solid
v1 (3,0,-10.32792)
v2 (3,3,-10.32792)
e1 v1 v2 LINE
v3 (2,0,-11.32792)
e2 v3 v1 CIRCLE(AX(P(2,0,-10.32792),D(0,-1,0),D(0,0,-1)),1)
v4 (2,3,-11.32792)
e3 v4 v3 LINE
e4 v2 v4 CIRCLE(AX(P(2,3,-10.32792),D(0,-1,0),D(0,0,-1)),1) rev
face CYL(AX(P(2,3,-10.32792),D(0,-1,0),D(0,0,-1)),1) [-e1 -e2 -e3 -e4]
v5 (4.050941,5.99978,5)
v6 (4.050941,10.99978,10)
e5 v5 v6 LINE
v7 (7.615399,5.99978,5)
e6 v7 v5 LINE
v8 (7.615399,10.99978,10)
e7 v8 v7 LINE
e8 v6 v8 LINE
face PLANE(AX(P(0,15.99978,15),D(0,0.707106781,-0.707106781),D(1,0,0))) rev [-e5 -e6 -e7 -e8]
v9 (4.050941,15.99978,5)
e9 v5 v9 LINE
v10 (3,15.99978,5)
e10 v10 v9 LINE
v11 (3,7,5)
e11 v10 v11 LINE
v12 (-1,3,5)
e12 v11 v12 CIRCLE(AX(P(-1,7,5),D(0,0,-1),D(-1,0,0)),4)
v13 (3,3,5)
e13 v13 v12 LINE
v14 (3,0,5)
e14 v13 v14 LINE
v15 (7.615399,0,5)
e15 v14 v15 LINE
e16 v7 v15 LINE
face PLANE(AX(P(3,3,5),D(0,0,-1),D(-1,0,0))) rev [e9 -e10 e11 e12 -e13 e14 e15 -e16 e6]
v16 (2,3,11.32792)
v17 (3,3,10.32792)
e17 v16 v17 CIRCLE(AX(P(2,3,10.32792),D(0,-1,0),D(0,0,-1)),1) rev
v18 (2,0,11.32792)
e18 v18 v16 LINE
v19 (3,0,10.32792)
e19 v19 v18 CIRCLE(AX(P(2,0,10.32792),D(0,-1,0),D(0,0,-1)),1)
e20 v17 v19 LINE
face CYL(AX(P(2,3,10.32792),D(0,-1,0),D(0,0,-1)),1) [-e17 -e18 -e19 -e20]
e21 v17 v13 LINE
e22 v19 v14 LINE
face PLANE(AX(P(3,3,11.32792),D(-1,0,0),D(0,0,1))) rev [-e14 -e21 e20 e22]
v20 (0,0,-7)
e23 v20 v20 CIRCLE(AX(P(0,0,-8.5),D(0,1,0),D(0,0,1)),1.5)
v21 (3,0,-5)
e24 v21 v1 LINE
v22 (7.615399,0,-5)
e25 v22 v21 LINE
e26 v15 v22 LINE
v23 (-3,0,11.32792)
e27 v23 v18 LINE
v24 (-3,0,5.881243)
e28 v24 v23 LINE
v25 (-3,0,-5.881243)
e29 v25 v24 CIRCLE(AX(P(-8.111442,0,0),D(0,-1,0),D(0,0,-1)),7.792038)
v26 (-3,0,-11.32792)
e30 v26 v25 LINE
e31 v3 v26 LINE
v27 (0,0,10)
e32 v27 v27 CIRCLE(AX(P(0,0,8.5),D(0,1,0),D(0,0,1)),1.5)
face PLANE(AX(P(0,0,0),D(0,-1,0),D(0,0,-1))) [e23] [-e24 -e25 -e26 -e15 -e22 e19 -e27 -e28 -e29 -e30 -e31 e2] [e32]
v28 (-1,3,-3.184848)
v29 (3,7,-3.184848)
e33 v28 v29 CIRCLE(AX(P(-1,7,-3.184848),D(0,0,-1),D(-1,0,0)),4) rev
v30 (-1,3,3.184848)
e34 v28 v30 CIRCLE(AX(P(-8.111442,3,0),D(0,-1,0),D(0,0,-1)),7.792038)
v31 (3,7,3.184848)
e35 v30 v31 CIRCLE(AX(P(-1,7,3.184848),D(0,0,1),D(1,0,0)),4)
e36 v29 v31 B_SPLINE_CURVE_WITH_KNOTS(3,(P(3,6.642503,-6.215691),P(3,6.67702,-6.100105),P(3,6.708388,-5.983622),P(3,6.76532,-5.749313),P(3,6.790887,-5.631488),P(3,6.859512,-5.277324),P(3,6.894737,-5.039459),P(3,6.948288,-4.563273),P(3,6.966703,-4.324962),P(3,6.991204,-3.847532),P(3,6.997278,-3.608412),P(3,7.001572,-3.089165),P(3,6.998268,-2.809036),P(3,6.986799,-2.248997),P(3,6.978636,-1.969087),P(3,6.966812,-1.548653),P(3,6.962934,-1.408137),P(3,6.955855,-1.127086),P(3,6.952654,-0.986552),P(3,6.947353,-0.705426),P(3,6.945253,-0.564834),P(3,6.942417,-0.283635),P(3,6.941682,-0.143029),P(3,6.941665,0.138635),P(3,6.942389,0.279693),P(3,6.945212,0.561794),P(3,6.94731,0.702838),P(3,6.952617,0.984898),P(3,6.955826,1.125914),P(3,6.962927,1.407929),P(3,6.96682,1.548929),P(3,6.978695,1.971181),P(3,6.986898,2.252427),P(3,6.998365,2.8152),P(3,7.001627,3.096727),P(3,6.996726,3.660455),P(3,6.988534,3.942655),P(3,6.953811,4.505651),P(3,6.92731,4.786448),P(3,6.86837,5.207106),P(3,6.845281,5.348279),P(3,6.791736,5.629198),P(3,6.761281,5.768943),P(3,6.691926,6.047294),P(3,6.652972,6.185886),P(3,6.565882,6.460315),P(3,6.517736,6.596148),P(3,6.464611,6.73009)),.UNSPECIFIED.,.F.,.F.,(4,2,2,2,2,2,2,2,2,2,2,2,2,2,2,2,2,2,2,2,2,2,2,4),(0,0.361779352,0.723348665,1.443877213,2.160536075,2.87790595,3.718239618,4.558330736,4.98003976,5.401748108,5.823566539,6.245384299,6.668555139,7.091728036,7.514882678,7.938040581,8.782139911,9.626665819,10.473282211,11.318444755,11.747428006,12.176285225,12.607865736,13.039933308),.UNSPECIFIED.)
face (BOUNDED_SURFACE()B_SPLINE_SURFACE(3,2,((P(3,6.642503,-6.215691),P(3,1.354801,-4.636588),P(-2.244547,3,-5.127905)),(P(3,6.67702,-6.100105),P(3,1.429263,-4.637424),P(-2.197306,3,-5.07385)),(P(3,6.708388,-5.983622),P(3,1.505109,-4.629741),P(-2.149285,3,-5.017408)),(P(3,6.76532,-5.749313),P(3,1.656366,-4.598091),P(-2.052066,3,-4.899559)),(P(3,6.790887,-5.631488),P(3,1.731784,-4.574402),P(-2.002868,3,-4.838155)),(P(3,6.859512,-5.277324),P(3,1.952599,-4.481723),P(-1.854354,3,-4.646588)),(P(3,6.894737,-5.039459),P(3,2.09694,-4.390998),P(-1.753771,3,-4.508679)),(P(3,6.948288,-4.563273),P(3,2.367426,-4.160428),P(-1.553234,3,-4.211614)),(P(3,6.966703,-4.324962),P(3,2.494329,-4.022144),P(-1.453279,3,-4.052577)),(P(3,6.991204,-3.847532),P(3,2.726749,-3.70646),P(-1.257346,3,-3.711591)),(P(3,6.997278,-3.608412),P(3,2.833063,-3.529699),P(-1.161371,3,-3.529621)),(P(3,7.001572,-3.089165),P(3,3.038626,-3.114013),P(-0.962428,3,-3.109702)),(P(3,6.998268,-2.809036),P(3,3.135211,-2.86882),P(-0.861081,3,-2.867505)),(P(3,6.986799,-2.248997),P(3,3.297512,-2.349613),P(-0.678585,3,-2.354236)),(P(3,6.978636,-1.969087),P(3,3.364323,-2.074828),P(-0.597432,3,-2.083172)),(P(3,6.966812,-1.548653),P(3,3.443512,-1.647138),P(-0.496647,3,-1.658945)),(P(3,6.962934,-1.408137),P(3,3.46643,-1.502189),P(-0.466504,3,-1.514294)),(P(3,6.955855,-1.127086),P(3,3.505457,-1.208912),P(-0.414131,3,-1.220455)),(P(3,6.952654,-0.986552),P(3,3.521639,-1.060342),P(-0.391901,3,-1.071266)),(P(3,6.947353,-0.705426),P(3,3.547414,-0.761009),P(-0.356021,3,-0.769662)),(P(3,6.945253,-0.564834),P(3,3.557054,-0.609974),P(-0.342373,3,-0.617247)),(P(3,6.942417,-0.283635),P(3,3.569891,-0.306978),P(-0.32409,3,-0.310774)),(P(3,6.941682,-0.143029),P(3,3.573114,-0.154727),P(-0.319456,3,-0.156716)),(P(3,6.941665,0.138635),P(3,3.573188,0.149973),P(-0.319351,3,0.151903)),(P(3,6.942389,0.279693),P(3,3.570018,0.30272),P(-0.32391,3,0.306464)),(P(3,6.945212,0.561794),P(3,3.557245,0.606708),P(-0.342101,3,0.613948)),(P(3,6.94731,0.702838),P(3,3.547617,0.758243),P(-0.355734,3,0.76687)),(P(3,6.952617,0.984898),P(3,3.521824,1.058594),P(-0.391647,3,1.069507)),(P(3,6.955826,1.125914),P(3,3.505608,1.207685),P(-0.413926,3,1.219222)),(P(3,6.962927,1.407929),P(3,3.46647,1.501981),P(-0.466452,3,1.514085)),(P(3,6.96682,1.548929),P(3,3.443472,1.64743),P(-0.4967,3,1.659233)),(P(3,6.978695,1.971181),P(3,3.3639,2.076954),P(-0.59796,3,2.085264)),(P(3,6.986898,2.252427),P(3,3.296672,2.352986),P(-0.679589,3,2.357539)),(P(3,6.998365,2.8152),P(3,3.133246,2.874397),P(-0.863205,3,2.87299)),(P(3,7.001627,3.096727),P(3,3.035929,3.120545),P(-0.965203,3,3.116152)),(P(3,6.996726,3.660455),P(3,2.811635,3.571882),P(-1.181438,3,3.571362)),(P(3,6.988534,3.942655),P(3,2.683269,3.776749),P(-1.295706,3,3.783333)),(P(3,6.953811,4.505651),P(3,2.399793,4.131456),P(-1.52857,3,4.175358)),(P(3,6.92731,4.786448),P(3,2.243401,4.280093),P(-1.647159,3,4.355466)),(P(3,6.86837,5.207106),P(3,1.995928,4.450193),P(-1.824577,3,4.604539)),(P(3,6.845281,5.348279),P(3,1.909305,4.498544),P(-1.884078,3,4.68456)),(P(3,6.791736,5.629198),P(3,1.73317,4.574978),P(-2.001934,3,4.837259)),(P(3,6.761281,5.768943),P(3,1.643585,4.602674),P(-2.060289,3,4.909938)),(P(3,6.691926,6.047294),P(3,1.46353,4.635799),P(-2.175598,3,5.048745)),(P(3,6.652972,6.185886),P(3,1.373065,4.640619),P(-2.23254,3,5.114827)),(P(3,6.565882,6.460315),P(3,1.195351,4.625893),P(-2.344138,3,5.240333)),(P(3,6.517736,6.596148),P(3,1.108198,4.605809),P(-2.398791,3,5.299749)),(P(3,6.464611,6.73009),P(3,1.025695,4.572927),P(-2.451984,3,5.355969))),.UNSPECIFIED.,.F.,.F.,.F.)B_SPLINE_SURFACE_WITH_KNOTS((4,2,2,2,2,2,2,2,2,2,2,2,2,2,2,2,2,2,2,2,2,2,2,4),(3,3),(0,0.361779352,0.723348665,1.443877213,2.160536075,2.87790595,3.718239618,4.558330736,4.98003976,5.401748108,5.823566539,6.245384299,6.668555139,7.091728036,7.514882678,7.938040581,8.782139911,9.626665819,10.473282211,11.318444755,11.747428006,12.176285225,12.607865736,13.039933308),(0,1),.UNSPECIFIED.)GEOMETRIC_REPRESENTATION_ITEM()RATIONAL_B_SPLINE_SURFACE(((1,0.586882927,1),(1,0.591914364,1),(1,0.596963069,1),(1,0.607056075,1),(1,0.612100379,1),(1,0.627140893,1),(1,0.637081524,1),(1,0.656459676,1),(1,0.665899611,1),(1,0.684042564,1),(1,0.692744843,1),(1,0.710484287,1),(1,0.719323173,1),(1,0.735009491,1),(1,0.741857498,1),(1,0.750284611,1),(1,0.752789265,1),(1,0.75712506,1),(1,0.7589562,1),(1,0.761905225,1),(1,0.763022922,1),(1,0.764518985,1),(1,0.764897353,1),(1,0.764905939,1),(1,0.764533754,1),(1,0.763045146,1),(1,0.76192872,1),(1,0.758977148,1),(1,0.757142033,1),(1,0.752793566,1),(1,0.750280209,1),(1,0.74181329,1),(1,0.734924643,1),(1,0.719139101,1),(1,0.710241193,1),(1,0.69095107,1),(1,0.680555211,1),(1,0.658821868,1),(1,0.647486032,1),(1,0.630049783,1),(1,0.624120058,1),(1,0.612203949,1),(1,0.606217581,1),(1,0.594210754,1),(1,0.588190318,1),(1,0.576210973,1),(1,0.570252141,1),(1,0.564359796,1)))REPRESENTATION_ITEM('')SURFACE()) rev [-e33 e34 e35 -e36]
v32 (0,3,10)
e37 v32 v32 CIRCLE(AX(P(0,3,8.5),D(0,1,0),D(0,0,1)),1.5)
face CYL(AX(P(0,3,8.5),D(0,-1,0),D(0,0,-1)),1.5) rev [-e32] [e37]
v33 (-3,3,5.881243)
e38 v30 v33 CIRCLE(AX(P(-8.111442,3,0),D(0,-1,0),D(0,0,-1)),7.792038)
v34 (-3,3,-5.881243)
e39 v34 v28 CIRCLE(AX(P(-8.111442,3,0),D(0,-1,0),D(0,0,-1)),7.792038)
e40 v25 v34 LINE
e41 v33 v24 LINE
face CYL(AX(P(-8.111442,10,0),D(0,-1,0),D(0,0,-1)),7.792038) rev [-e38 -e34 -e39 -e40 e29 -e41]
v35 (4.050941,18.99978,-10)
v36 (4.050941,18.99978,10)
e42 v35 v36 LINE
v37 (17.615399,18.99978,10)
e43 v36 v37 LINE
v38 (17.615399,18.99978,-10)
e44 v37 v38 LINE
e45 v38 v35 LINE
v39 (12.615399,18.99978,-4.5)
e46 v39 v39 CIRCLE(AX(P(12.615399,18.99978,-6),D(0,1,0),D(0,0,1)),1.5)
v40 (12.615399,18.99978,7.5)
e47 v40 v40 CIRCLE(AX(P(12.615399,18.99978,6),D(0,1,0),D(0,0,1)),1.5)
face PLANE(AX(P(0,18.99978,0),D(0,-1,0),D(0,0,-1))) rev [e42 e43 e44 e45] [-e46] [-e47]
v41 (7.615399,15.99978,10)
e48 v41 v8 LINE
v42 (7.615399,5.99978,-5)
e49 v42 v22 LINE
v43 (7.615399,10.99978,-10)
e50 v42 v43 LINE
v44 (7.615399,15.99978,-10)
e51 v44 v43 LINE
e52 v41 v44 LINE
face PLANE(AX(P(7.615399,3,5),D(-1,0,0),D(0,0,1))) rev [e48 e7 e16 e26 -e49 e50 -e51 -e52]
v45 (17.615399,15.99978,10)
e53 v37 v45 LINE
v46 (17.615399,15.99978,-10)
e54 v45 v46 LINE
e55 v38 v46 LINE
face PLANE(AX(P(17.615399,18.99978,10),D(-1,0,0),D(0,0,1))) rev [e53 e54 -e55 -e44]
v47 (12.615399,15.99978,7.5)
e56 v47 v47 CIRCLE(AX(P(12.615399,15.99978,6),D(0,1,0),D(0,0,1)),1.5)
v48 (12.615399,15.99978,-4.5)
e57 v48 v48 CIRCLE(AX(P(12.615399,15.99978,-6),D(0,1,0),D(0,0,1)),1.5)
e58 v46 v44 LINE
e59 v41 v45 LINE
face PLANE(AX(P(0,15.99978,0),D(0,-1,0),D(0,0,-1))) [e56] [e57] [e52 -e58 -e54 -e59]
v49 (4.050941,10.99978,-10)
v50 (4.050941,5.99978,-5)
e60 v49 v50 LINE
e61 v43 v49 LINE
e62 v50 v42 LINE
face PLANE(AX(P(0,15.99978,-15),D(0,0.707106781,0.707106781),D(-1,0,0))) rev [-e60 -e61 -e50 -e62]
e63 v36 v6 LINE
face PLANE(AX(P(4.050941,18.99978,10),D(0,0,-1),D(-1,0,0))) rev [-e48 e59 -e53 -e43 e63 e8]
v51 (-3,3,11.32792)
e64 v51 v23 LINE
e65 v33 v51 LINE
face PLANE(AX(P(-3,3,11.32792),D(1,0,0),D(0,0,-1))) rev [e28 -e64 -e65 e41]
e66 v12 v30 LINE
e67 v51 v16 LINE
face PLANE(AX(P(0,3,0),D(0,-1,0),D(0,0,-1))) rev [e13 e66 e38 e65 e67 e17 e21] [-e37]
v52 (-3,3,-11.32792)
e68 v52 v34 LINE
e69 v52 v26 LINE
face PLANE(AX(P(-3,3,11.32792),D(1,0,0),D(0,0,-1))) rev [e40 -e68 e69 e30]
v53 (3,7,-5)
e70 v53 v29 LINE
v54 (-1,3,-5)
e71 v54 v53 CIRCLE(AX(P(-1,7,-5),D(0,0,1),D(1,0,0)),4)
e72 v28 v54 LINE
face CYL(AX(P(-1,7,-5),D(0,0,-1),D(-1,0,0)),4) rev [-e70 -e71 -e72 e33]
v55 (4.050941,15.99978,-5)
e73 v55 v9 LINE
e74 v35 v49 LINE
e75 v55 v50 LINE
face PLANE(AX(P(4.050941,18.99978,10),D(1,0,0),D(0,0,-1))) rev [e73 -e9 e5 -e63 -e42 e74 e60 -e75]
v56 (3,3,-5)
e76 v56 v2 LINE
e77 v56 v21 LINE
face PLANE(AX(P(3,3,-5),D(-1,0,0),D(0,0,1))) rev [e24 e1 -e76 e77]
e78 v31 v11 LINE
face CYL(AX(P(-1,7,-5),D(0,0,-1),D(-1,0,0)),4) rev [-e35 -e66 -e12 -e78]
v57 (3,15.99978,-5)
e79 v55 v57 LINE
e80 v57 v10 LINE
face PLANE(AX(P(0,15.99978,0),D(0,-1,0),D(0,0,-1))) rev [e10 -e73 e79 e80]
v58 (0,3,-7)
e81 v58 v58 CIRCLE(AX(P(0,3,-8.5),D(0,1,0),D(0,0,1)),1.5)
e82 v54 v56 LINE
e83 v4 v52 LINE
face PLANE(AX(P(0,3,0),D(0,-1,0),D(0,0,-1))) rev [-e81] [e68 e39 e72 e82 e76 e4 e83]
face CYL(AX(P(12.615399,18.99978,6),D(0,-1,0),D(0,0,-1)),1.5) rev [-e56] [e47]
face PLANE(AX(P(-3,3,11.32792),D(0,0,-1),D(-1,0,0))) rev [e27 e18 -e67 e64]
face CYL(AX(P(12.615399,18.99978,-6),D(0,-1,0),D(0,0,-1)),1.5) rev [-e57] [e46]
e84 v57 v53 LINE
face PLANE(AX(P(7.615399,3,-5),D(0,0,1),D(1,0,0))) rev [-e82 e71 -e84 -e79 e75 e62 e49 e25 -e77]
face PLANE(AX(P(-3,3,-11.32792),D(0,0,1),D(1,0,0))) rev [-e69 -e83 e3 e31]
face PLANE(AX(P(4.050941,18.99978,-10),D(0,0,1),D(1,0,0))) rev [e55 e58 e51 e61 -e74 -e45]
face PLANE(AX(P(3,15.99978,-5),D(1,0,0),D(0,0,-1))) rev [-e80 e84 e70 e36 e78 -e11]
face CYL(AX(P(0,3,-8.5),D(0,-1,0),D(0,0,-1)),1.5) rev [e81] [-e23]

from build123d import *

# Parameters (mm, degrees)
SKETCH1_R           = 1.5
BOSS_EXTRUDE1_DEPTH = 3
SKETCH3_W           = 4.615398666
SKETCH3_H           = 10
BOSS_EXTRUDE2_DEPTH = 12.9997796
FILLET7_R           = 1
CUT_EXTRUDE4_DEPTH  = 10
SKETCH9_W           = 13.564457496
SKETCH9_H           = 20
SKETCH9_R           = 1.5
BOSS_EXTRUDE3_DEPTH = 3
CHAMFER1_SIZE       = 10
CHAMFER2_SIZE       = 10
FILLET8_R           = 4


with BuildPart() as part:
    # Sketch1 → Boss-Extrude1 (new body)
    with BuildSketch(Plane(origin=(0, 0, 0), x_dir=(1, 0, 0), z_dir=(0, 1, 0))):
        Polygon((-3, -11.32792047), (3, -11.32792047), (3, -5), (7.615398666, -5), (7.615398666, 5), (3, 5), (3, 11.32792047), (-3, 11.32792047), align=None)
        with Locations(Location((0, 8.5, 0), (0, 0, 270))):
            Circle(SKETCH1_R, mode=Mode.SUBTRACT)
        with Locations(Location((0, -8.5, 0), (0, 0, 270))):
            Circle(SKETCH1_R, mode=Mode.SUBTRACT)
    extrude(amount=BOSS_EXTRUDE1_DEPTH)

    # Sketch3 → Boss-Extrude2 (add)
    with BuildSketch(Plane(origin=(0, 3, 0), x_dir=(1, 0, 0), z_dir=(0, 1, 0))):
        with Locations((5.307699333, 0)):
            Rectangle(SKETCH3_W, SKETCH3_H)
    extrude(amount=BOSS_EXTRUDE2_DEPTH)

    # Fillet7
    fillet7_edges = [part.edges().sort_by_distance(p)[0] for p in [
        (3, 1.5, 11.32792047),
        (3, 1.5, -11.32792047),
    ]]
    fillet(fillet7_edges, radius=FILLET7_R)

    # Sketch7 → Cut-Extrude4 (cut)
    with BuildSketch(Plane.XZ):
        with BuildLine():
            Line((-3.65526474, -6.392053518), (-3.78188192, 6.478485425))
            ThreePointArc((-3.78188192, 6.478485425), (-0.319780446, 0.076652438), (-3.65526474, -6.392053518))
        make_face()
    extrude(amount=-CUT_EXTRUDE4_DEPTH, mode=Mode.SUBTRACT)

    # Sketch9 → Boss-Extrude3 (add)
    with BuildSketch(Plane(origin=(0, 15.9997796, 0), x_dir=(1, 0, 0), z_dir=(0, 1, 0))):
        with Locations((10.833169918, 0)):
            Rectangle(SKETCH9_W, SKETCH9_H)
        with Locations(Location((12.615398666, 6, 0), (0, 0, 270))):
            Circle(SKETCH9_R, mode=Mode.SUBTRACT)
        with Locations(Location((12.615398666, -6, 0), (0, 0, 270))):
            Circle(SKETCH9_R, mode=Mode.SUBTRACT)
    extrude(amount=BOSS_EXTRUDE3_DEPTH)

    # Chamfer1
    # the kernel refuses this chamfer: 10 mm, written as the material it adds along each edge
    with BuildSketch(Plane(origin=(4.05094117, 15.9997796, 5), x_dir=(0, -0.9996219169112968, -0.027495876610586403), z_dir=(1, 0, 0))) as chamfer1_piece_1_section:
        Polygon((CHAMFER1_SIZE * 0.999621916911, -CHAMFER1_SIZE * 0.0274958766106), (-CHAMFER1_SIZE * 0.0274958766106, -CHAMFER1_SIZE * 0.999621916911), (0, 0), align=None)
    chamfer1_piece_1 = extrude(amount=3.564457497, mode=Mode.PRIVATE)
    chamfer1_piece_1 = split(chamfer1_piece_1, bisect_by=Plane(origin=(5.833169918, 12.110890711, 10), z_dir=(0, 0, -1)), keep=Keep.TOP, mode=Mode.PRIVATE)
    add(chamfer1_piece_1)

    # Chamfer2
    # the kernel refuses this chamfer: 10 mm, written as the material it adds along each edge
    with BuildSketch(Plane(origin=(7.615398666, 15.9997796, -5), x_dir=(0, -0.9996219169112968, 0.027495876610586403), z_dir=(-1, 0, 0))) as chamfer2_piece_1_section:
        Polygon((CHAMFER2_SIZE * 0.999621916911, -CHAMFER2_SIZE * 0.0274958766106), (-CHAMFER2_SIZE * 0.0274958766106, -CHAMFER2_SIZE * 0.999621916911), (0, 0), align=None)
    chamfer2_piece_1 = extrude(amount=3.564457497, mode=Mode.PRIVATE)
    chamfer2_piece_1 = split(chamfer2_piece_1, bisect_by=Plane(origin=(5.833169918, 12.110890711, -10), z_dir=(0, 0, 1)), keep=Keep.TOP, mode=Mode.PRIVATE)
    add(chamfer2_piece_1)

    # Fillet8
    fillet8_edges = [part.edges().sort_by_distance(p)[0] for p in [
        (3, 3, 0),
    ]]
    fillet(fillet8_edges, radius=FILLET8_R)


solid = part.part
